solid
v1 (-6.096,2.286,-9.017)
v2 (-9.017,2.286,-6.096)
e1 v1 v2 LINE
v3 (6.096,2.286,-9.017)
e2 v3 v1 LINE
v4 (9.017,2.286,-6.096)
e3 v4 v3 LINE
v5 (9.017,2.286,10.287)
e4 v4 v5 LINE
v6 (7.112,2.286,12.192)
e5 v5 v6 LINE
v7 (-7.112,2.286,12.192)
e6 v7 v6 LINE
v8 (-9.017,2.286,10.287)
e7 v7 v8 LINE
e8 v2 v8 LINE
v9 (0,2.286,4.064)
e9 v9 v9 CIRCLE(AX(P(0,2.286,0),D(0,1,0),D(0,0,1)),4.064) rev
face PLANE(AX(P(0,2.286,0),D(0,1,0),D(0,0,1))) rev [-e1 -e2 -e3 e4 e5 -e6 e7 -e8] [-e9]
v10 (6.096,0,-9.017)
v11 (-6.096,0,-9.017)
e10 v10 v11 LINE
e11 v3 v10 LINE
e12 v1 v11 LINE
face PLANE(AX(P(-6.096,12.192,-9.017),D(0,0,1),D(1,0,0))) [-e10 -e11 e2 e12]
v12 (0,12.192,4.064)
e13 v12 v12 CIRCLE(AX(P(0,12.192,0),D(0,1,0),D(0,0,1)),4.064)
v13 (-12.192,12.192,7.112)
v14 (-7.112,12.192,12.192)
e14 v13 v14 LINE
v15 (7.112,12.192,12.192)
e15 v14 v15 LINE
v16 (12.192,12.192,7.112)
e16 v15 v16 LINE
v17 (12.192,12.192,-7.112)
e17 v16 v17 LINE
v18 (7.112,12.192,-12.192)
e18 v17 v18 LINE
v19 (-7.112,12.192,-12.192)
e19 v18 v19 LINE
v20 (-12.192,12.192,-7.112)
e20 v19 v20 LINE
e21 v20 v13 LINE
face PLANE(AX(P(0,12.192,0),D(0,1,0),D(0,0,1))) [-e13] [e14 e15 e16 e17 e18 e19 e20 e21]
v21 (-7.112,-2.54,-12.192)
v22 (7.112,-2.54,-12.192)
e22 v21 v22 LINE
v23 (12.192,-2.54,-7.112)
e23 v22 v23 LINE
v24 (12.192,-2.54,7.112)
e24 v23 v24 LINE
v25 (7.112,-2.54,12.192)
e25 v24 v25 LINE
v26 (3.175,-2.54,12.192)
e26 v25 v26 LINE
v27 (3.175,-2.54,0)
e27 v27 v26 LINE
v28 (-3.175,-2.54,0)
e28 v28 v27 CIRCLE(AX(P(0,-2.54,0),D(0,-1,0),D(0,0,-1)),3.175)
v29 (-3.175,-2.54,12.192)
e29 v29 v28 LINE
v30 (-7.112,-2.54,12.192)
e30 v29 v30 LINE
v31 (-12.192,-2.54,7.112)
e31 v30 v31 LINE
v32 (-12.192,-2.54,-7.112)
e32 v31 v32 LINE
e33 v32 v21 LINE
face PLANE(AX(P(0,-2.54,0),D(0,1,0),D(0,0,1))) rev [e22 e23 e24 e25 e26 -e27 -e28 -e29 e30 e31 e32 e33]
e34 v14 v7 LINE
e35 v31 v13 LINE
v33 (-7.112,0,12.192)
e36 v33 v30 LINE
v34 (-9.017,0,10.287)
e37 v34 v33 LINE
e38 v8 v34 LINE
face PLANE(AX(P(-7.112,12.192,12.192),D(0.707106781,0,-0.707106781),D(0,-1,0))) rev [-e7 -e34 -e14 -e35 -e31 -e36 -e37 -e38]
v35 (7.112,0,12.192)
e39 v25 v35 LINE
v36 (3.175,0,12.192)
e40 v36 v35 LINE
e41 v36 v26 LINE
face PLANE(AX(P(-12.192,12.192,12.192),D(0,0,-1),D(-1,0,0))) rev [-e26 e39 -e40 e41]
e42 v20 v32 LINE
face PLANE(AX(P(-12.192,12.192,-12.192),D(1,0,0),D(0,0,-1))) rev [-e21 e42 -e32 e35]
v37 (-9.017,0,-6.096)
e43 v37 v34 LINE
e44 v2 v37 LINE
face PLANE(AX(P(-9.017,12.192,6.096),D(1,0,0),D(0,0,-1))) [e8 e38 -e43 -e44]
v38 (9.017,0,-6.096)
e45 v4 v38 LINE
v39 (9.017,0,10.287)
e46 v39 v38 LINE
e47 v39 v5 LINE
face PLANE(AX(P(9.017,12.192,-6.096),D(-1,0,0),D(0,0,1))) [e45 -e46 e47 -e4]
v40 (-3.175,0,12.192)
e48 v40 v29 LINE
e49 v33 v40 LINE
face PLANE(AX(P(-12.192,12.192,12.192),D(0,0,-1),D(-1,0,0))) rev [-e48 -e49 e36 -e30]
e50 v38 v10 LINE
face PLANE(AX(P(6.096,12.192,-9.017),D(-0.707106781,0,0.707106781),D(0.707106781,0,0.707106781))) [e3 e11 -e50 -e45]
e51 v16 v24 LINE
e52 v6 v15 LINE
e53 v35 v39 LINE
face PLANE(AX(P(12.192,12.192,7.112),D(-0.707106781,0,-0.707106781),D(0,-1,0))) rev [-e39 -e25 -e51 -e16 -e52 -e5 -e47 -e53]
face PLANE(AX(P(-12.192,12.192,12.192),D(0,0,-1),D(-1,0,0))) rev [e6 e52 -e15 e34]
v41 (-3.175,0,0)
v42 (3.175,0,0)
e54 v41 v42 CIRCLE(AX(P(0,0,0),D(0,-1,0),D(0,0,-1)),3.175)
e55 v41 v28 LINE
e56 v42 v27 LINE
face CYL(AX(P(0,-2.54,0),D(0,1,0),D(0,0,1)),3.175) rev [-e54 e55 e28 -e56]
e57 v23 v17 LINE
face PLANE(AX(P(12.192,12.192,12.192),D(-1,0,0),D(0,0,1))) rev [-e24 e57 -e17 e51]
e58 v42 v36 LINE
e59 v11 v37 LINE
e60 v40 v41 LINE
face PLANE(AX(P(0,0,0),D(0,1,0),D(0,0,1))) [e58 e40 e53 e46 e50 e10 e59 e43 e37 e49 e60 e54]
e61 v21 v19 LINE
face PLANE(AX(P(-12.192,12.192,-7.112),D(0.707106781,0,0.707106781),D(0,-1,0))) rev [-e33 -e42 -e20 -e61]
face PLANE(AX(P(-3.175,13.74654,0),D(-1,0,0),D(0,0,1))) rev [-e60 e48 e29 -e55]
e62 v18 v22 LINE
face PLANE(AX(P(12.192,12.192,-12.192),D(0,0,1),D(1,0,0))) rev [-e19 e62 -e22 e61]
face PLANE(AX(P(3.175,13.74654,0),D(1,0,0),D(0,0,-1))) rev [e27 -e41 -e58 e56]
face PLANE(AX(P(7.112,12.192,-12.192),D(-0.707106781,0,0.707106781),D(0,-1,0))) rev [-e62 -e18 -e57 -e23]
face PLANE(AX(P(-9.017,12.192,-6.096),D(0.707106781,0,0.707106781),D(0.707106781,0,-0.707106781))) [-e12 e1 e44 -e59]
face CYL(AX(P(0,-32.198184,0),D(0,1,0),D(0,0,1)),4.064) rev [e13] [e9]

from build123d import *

# Parameters (mm, degrees)
SKETCH1_W           = 24.384
SKETCH1_H           = 24.384
BOSS_EXTRUDE1_DEPTH = 12.192
SKETCH2_W           = 24.384
SKETCH2_H           = 24.384
SKETCH2_R           = 3.175
BOSS_EXTRUDE2_DEPTH = 2.54
SKETCH3_W           = 6.35
SKETCH3_H           = 12.192
CUT_EXTRUDE1_DEPTH  = 2.54
CUT_EXTRUDE2_DEPTH  = 2.286
SKETCH5_W           = 24.384
SKETCH5_H           = 24.384
SKETCH5_R           = 4.064
BOSS_EXTRUDE3_DEPTH = 9.906
CHAMFER1_SIZE       = 5.08


with BuildPart() as part:
    # Sketch1 → Boss-Extrude1 (new body)
    with BuildSketch(Plane(origin=(0, 0, 0), x_dir=(1, 0, 0), z_dir=(0, 1, 0))):
        Rectangle(SKETCH1_W, SKETCH1_H)
        Polygon((-6.096, 9.017), (6.096, 9.017), (9.017, 6.096), (9.017, -6.096), (6.096, -9.017), (-6.096, -9.017), (-9.017, -6.096), (-9.017, 6.096), align=None, mode=Mode.SUBTRACT)
    extrude(amount=BOSS_EXTRUDE1_DEPTH)

    # Sketch2 → Boss-Extrude2 (add)
    with BuildSketch(Plane.XZ):
        Rectangle(SKETCH2_W, SKETCH2_H)
        with Locations(Location((0, 0, 0), (0, 0, 270))):
            Circle(SKETCH2_R, mode=Mode.SUBTRACT)
    extrude(amount=BOSS_EXTRUDE2_DEPTH)

    # Sketch3 → Cut-Extrude1 (cut)
    with BuildSketch(Plane.XZ.offset(2.54)):
        with Locations((0, 6.096)):
            Rectangle(SKETCH3_W, SKETCH3_H)
    extrude(amount=-CUT_EXTRUDE1_DEPTH, mode=Mode.SUBTRACT)

    # Sketch4 → Cut-Extrude2 (cut)
    with BuildSketch(Plane(origin=(0, 0, 0), x_dir=(1, 0, 0), z_dir=(0, 1, 0))):
        Polygon((-3.175, -6.096), (-9.017, -6.096), (-6.096, -9.017), (-3.175, -9.017), align=None)
        Polygon((-6.096, -9.017), (-9.017, -6.096), (-9.017, -12.192), (9.017, -12.192), (9.017, -6.096), (6.096, -9.017), (3.175, -9.017), (3.175, -6.096), (-3.175, -6.096), (-3.175, -9.017), align=None)
        Polygon((9.017, -6.096), (3.175, -6.096), (3.175, -9.017), (6.096, -9.017), align=None)
    extrude(amount=CUT_EXTRUDE2_DEPTH, mode=Mode.SUBTRACT)

    # Sketch5 → Boss-Extrude3 (add)
    with BuildSketch(Plane(origin=(0, 12.192, 0), x_dir=(1, 0, 0), z_dir=(0, 1, 0))):
        Rectangle(SKETCH5_W, SKETCH5_H)
        with Locations(Location((0, 0, 0), (0, 0, 270))):
            Circle(SKETCH5_R, mode=Mode.SUBTRACT)
    extrude(amount=-BOSS_EXTRUDE3_DEPTH)

    # Chamfer1
    # the kernel refuses this chamfer: 5.08 mm, written as the material it takes off along each edge
    with BuildSketch(Plane(origin=(12.192, 25.256149579, -12.192), x_dir=(0.027495876610586254, -5.537865568379339e-15, 0.9996219169112968), z_dir=(0, -1, 0)), Plane(origin=(12.192, -15.604149579, 12.192), x_dir=(0.027495876610586268, 0, -0.9996219169112968), z_dir=(0, 1, 0))) as chamfer1_piece_1:
        Polygon((CHAMFER1_SIZE * 0.999621916911, CHAMFER1_SIZE * 0.0274958766106), (-CHAMFER1_SIZE * 0.0274958766106, CHAMFER1_SIZE * 0.999621916911), (0, 0), align=None)
    extrude(amount=40.860299158, mode=Mode.SUBTRACT)
    with BuildSketch(Plane(origin=(-12.192, 25.256149579, -12.192), x_dir=(-0.027495876610586265, -3.4921279629514554e-15, 0.9996219169112968), z_dir=(0, -1, 0)), Plane(origin=(-12.192, -15.604149579, 12.192), x_dir=(-0.027495876610586275, 0, -0.9996219169112968), z_dir=(0, 1, 0))) as chamfer1_piece_2:
        Polygon((CHAMFER1_SIZE * 0.999621916911, -CHAMFER1_SIZE * 0.0274958766106), (-CHAMFER1_SIZE * 0.0274958766106, -CHAMFER1_SIZE * 0.999621916911), (0, 0), align=None)
    extrude(amount=40.860299158, mode=Mode.SUBTRACT)


solid = part.part
